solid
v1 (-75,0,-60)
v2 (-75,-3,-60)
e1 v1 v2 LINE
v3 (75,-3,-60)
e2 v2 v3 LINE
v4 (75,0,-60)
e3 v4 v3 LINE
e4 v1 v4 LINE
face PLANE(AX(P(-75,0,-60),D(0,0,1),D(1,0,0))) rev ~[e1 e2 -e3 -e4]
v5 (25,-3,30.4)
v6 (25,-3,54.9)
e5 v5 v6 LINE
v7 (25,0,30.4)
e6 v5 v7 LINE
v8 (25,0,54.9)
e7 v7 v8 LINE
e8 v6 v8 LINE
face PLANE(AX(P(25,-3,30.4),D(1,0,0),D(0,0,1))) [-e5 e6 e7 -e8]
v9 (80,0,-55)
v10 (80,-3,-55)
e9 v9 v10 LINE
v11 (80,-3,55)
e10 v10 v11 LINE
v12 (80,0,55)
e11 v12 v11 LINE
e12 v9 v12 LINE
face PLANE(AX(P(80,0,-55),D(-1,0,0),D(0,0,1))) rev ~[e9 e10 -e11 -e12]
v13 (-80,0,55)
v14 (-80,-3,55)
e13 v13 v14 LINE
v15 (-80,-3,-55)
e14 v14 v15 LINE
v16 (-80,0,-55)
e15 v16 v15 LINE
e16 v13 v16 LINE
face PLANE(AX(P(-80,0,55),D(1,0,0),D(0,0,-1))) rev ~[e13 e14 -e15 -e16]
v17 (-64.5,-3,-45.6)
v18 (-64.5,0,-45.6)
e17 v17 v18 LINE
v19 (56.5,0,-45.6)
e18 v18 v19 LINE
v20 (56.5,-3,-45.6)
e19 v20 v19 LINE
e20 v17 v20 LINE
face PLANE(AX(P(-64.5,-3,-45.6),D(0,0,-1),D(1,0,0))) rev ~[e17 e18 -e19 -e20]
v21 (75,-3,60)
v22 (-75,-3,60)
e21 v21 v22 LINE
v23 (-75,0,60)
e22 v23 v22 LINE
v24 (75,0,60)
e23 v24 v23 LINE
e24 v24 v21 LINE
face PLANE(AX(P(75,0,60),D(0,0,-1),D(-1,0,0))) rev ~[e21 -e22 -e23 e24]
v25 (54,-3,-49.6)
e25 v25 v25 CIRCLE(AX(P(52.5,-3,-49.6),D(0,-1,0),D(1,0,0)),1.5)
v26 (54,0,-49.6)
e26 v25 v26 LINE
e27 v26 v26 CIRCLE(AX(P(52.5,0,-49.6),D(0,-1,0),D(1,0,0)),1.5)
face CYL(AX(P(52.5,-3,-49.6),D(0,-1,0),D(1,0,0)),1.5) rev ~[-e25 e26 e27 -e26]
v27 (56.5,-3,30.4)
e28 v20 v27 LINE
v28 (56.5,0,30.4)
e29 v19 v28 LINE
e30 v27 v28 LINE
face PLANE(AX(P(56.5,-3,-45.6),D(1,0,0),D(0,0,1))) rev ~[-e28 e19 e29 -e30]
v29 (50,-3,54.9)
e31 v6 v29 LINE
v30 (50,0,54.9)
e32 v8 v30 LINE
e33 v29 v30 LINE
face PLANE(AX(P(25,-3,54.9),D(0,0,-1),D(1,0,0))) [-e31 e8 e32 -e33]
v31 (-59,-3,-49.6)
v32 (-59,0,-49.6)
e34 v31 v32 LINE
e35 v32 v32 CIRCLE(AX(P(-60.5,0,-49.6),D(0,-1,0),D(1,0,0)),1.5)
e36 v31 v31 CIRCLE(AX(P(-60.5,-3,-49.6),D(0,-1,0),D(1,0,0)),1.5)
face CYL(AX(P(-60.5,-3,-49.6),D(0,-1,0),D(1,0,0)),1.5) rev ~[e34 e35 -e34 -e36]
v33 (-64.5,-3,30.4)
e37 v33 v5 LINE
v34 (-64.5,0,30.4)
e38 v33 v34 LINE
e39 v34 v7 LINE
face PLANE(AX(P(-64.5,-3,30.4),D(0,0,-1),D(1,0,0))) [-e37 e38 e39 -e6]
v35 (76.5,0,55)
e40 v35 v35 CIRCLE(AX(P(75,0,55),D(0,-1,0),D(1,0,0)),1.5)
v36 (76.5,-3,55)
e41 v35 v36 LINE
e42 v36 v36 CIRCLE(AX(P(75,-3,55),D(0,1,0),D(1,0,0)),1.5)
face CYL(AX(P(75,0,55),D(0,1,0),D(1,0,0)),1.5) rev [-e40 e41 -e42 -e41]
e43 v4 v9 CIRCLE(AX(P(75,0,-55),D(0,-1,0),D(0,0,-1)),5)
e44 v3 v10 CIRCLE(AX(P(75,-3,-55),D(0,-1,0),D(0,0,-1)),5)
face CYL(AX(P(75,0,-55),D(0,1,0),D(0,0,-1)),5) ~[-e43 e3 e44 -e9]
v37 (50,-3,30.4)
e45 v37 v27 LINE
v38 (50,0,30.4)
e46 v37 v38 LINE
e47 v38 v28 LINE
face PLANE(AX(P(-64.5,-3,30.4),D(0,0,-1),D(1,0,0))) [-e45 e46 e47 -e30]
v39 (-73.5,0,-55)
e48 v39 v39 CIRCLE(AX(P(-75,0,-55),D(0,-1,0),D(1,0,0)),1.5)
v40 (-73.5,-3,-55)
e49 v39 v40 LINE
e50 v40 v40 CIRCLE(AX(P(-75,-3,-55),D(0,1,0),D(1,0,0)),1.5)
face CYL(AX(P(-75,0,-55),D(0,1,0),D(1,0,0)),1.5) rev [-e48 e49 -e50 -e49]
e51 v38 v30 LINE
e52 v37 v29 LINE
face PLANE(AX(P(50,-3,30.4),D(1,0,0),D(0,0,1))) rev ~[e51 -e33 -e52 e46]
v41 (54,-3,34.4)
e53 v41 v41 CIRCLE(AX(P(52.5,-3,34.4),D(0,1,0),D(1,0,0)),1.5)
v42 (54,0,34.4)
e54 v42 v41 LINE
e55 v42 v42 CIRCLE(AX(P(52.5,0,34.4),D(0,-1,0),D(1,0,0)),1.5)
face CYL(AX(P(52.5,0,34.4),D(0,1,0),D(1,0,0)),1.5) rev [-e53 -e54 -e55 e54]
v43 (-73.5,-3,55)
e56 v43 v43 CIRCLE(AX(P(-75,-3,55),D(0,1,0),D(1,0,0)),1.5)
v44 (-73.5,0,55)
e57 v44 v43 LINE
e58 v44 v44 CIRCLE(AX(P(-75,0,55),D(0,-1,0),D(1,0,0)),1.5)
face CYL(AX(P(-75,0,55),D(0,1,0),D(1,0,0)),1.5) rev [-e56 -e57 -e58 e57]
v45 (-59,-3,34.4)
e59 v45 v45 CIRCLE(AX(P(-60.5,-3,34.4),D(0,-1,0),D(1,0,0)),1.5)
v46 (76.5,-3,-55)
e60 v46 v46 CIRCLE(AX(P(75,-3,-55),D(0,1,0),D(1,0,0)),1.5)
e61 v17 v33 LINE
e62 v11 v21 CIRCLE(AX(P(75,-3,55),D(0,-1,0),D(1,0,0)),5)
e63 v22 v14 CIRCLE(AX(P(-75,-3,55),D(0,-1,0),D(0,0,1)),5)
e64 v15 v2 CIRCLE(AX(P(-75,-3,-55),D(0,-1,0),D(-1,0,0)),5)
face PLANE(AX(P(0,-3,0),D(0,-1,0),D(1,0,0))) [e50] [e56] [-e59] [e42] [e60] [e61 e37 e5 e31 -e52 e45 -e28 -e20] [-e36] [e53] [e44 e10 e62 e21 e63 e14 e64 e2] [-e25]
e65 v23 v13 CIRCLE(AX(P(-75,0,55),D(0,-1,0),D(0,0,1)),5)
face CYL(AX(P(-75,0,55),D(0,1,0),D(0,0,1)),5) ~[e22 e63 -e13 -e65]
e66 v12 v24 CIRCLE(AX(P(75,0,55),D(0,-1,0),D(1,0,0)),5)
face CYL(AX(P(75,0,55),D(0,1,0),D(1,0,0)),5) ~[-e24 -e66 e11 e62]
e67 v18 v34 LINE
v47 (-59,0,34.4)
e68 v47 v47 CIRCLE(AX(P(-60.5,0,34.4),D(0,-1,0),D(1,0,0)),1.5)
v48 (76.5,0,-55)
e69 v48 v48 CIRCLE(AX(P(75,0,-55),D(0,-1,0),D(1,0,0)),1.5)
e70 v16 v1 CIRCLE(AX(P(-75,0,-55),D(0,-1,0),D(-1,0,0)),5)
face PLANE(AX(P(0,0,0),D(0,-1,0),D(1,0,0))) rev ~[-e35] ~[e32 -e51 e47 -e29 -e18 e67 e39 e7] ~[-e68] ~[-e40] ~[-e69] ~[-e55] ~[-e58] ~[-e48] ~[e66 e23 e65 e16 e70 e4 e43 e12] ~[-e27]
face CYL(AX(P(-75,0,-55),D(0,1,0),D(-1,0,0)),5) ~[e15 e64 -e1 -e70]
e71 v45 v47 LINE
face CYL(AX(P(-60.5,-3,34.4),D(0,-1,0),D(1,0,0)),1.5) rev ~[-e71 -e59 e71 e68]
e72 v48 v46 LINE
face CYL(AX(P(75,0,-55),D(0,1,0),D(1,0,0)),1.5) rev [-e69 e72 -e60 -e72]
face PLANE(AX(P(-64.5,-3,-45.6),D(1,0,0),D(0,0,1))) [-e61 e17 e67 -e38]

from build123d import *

# Parameters (mm, degrees)
F1_DEPTH = 3
F2_R     = 1.5
F3_DEPTH = 25
F4_R     = 1.5
F5_DEPTH = 25
F6_W     = 121
F6_H     = 76
F6_R     = 1.5
F7_DEPTH = 3
F8_W     = 25
F8_H     = 24.5
F9_DEPTH = 3


# Not quite as in the source:
# - a feature names something its author has since deleted; it is built from what else it names


with BuildPart() as f1:
    # F0 (on Front) → F1 (new body)
    with BuildSketch(Plane.XZ):
        with BuildLine():
            Line((-75, -60), (75, -60))
            ThreePointArc((75, -60), (78.5355339059, -58.5355339059), (80, -55))
            Line((80, -55), (80, 55))
            ThreePointArc((80, 55), (78.5355339059, 58.5355339059), (75, 60))
            Line((75, 60), (-75, 60))
            ThreePointArc((-75, 60), (-78.5355339059, 58.5355339059), (-80, 55))
            Line((-80, 55), (-80, -55))
            ThreePointArc((-80, -55), (-78.5355339059, -58.5355339059), (-75, -60))
        make_face()
    extrude(amount=F1_DEPTH)

    # F2 (on Front) → F3 (cut)
    with BuildSketch(Plane.XZ):
        with Locations((-75, 55)):
            Circle(F2_R)
        with Locations((75, 55)):
            Circle(F2_R)
        with Locations((75, -55)):
            Circle(F2_R)
        with Locations((-75, -55)):
            Circle(F2_R)
    extrude(amount=F3_DEPTH, mode=Mode.SUBTRACT)

    # F4 (on Front) → F5 (cut)
    with BuildSketch(Plane.XZ):
        with Locations((52.5, 34.4)):
            Circle(F4_R)
    extrude(amount=F5_DEPTH, mode=Mode.SUBTRACT)

    # F6 (on face) → F7 (cut)
    with BuildSketch(Plane.XZ.offset(3)):
        with Locations((-4, -7.6)):
            Rectangle(F6_W, F6_H)
        with Locations((52.5, 34.4)):
            Circle(F6_R)
        with Locations((-60.5, 34.4)):
            Circle(F6_R)
        with Locations((-60.5, -49.6)):
            Circle(F6_R)
        with Locations((52.5, -49.6)):
            Circle(F6_R)
    extrude(amount=-F7_DEPTH, mode=Mode.SUBTRACT)

    # F8 (on face) → F9 (cut)
    with BuildSketch(Plane.XZ.offset(3)):
        with Locations((37.5, 42.65)):
            Rectangle(F8_W, F8_H)
    extrude(amount=-F9_DEPTH, mode=Mode.SUBTRACT)


solid = f1.part
